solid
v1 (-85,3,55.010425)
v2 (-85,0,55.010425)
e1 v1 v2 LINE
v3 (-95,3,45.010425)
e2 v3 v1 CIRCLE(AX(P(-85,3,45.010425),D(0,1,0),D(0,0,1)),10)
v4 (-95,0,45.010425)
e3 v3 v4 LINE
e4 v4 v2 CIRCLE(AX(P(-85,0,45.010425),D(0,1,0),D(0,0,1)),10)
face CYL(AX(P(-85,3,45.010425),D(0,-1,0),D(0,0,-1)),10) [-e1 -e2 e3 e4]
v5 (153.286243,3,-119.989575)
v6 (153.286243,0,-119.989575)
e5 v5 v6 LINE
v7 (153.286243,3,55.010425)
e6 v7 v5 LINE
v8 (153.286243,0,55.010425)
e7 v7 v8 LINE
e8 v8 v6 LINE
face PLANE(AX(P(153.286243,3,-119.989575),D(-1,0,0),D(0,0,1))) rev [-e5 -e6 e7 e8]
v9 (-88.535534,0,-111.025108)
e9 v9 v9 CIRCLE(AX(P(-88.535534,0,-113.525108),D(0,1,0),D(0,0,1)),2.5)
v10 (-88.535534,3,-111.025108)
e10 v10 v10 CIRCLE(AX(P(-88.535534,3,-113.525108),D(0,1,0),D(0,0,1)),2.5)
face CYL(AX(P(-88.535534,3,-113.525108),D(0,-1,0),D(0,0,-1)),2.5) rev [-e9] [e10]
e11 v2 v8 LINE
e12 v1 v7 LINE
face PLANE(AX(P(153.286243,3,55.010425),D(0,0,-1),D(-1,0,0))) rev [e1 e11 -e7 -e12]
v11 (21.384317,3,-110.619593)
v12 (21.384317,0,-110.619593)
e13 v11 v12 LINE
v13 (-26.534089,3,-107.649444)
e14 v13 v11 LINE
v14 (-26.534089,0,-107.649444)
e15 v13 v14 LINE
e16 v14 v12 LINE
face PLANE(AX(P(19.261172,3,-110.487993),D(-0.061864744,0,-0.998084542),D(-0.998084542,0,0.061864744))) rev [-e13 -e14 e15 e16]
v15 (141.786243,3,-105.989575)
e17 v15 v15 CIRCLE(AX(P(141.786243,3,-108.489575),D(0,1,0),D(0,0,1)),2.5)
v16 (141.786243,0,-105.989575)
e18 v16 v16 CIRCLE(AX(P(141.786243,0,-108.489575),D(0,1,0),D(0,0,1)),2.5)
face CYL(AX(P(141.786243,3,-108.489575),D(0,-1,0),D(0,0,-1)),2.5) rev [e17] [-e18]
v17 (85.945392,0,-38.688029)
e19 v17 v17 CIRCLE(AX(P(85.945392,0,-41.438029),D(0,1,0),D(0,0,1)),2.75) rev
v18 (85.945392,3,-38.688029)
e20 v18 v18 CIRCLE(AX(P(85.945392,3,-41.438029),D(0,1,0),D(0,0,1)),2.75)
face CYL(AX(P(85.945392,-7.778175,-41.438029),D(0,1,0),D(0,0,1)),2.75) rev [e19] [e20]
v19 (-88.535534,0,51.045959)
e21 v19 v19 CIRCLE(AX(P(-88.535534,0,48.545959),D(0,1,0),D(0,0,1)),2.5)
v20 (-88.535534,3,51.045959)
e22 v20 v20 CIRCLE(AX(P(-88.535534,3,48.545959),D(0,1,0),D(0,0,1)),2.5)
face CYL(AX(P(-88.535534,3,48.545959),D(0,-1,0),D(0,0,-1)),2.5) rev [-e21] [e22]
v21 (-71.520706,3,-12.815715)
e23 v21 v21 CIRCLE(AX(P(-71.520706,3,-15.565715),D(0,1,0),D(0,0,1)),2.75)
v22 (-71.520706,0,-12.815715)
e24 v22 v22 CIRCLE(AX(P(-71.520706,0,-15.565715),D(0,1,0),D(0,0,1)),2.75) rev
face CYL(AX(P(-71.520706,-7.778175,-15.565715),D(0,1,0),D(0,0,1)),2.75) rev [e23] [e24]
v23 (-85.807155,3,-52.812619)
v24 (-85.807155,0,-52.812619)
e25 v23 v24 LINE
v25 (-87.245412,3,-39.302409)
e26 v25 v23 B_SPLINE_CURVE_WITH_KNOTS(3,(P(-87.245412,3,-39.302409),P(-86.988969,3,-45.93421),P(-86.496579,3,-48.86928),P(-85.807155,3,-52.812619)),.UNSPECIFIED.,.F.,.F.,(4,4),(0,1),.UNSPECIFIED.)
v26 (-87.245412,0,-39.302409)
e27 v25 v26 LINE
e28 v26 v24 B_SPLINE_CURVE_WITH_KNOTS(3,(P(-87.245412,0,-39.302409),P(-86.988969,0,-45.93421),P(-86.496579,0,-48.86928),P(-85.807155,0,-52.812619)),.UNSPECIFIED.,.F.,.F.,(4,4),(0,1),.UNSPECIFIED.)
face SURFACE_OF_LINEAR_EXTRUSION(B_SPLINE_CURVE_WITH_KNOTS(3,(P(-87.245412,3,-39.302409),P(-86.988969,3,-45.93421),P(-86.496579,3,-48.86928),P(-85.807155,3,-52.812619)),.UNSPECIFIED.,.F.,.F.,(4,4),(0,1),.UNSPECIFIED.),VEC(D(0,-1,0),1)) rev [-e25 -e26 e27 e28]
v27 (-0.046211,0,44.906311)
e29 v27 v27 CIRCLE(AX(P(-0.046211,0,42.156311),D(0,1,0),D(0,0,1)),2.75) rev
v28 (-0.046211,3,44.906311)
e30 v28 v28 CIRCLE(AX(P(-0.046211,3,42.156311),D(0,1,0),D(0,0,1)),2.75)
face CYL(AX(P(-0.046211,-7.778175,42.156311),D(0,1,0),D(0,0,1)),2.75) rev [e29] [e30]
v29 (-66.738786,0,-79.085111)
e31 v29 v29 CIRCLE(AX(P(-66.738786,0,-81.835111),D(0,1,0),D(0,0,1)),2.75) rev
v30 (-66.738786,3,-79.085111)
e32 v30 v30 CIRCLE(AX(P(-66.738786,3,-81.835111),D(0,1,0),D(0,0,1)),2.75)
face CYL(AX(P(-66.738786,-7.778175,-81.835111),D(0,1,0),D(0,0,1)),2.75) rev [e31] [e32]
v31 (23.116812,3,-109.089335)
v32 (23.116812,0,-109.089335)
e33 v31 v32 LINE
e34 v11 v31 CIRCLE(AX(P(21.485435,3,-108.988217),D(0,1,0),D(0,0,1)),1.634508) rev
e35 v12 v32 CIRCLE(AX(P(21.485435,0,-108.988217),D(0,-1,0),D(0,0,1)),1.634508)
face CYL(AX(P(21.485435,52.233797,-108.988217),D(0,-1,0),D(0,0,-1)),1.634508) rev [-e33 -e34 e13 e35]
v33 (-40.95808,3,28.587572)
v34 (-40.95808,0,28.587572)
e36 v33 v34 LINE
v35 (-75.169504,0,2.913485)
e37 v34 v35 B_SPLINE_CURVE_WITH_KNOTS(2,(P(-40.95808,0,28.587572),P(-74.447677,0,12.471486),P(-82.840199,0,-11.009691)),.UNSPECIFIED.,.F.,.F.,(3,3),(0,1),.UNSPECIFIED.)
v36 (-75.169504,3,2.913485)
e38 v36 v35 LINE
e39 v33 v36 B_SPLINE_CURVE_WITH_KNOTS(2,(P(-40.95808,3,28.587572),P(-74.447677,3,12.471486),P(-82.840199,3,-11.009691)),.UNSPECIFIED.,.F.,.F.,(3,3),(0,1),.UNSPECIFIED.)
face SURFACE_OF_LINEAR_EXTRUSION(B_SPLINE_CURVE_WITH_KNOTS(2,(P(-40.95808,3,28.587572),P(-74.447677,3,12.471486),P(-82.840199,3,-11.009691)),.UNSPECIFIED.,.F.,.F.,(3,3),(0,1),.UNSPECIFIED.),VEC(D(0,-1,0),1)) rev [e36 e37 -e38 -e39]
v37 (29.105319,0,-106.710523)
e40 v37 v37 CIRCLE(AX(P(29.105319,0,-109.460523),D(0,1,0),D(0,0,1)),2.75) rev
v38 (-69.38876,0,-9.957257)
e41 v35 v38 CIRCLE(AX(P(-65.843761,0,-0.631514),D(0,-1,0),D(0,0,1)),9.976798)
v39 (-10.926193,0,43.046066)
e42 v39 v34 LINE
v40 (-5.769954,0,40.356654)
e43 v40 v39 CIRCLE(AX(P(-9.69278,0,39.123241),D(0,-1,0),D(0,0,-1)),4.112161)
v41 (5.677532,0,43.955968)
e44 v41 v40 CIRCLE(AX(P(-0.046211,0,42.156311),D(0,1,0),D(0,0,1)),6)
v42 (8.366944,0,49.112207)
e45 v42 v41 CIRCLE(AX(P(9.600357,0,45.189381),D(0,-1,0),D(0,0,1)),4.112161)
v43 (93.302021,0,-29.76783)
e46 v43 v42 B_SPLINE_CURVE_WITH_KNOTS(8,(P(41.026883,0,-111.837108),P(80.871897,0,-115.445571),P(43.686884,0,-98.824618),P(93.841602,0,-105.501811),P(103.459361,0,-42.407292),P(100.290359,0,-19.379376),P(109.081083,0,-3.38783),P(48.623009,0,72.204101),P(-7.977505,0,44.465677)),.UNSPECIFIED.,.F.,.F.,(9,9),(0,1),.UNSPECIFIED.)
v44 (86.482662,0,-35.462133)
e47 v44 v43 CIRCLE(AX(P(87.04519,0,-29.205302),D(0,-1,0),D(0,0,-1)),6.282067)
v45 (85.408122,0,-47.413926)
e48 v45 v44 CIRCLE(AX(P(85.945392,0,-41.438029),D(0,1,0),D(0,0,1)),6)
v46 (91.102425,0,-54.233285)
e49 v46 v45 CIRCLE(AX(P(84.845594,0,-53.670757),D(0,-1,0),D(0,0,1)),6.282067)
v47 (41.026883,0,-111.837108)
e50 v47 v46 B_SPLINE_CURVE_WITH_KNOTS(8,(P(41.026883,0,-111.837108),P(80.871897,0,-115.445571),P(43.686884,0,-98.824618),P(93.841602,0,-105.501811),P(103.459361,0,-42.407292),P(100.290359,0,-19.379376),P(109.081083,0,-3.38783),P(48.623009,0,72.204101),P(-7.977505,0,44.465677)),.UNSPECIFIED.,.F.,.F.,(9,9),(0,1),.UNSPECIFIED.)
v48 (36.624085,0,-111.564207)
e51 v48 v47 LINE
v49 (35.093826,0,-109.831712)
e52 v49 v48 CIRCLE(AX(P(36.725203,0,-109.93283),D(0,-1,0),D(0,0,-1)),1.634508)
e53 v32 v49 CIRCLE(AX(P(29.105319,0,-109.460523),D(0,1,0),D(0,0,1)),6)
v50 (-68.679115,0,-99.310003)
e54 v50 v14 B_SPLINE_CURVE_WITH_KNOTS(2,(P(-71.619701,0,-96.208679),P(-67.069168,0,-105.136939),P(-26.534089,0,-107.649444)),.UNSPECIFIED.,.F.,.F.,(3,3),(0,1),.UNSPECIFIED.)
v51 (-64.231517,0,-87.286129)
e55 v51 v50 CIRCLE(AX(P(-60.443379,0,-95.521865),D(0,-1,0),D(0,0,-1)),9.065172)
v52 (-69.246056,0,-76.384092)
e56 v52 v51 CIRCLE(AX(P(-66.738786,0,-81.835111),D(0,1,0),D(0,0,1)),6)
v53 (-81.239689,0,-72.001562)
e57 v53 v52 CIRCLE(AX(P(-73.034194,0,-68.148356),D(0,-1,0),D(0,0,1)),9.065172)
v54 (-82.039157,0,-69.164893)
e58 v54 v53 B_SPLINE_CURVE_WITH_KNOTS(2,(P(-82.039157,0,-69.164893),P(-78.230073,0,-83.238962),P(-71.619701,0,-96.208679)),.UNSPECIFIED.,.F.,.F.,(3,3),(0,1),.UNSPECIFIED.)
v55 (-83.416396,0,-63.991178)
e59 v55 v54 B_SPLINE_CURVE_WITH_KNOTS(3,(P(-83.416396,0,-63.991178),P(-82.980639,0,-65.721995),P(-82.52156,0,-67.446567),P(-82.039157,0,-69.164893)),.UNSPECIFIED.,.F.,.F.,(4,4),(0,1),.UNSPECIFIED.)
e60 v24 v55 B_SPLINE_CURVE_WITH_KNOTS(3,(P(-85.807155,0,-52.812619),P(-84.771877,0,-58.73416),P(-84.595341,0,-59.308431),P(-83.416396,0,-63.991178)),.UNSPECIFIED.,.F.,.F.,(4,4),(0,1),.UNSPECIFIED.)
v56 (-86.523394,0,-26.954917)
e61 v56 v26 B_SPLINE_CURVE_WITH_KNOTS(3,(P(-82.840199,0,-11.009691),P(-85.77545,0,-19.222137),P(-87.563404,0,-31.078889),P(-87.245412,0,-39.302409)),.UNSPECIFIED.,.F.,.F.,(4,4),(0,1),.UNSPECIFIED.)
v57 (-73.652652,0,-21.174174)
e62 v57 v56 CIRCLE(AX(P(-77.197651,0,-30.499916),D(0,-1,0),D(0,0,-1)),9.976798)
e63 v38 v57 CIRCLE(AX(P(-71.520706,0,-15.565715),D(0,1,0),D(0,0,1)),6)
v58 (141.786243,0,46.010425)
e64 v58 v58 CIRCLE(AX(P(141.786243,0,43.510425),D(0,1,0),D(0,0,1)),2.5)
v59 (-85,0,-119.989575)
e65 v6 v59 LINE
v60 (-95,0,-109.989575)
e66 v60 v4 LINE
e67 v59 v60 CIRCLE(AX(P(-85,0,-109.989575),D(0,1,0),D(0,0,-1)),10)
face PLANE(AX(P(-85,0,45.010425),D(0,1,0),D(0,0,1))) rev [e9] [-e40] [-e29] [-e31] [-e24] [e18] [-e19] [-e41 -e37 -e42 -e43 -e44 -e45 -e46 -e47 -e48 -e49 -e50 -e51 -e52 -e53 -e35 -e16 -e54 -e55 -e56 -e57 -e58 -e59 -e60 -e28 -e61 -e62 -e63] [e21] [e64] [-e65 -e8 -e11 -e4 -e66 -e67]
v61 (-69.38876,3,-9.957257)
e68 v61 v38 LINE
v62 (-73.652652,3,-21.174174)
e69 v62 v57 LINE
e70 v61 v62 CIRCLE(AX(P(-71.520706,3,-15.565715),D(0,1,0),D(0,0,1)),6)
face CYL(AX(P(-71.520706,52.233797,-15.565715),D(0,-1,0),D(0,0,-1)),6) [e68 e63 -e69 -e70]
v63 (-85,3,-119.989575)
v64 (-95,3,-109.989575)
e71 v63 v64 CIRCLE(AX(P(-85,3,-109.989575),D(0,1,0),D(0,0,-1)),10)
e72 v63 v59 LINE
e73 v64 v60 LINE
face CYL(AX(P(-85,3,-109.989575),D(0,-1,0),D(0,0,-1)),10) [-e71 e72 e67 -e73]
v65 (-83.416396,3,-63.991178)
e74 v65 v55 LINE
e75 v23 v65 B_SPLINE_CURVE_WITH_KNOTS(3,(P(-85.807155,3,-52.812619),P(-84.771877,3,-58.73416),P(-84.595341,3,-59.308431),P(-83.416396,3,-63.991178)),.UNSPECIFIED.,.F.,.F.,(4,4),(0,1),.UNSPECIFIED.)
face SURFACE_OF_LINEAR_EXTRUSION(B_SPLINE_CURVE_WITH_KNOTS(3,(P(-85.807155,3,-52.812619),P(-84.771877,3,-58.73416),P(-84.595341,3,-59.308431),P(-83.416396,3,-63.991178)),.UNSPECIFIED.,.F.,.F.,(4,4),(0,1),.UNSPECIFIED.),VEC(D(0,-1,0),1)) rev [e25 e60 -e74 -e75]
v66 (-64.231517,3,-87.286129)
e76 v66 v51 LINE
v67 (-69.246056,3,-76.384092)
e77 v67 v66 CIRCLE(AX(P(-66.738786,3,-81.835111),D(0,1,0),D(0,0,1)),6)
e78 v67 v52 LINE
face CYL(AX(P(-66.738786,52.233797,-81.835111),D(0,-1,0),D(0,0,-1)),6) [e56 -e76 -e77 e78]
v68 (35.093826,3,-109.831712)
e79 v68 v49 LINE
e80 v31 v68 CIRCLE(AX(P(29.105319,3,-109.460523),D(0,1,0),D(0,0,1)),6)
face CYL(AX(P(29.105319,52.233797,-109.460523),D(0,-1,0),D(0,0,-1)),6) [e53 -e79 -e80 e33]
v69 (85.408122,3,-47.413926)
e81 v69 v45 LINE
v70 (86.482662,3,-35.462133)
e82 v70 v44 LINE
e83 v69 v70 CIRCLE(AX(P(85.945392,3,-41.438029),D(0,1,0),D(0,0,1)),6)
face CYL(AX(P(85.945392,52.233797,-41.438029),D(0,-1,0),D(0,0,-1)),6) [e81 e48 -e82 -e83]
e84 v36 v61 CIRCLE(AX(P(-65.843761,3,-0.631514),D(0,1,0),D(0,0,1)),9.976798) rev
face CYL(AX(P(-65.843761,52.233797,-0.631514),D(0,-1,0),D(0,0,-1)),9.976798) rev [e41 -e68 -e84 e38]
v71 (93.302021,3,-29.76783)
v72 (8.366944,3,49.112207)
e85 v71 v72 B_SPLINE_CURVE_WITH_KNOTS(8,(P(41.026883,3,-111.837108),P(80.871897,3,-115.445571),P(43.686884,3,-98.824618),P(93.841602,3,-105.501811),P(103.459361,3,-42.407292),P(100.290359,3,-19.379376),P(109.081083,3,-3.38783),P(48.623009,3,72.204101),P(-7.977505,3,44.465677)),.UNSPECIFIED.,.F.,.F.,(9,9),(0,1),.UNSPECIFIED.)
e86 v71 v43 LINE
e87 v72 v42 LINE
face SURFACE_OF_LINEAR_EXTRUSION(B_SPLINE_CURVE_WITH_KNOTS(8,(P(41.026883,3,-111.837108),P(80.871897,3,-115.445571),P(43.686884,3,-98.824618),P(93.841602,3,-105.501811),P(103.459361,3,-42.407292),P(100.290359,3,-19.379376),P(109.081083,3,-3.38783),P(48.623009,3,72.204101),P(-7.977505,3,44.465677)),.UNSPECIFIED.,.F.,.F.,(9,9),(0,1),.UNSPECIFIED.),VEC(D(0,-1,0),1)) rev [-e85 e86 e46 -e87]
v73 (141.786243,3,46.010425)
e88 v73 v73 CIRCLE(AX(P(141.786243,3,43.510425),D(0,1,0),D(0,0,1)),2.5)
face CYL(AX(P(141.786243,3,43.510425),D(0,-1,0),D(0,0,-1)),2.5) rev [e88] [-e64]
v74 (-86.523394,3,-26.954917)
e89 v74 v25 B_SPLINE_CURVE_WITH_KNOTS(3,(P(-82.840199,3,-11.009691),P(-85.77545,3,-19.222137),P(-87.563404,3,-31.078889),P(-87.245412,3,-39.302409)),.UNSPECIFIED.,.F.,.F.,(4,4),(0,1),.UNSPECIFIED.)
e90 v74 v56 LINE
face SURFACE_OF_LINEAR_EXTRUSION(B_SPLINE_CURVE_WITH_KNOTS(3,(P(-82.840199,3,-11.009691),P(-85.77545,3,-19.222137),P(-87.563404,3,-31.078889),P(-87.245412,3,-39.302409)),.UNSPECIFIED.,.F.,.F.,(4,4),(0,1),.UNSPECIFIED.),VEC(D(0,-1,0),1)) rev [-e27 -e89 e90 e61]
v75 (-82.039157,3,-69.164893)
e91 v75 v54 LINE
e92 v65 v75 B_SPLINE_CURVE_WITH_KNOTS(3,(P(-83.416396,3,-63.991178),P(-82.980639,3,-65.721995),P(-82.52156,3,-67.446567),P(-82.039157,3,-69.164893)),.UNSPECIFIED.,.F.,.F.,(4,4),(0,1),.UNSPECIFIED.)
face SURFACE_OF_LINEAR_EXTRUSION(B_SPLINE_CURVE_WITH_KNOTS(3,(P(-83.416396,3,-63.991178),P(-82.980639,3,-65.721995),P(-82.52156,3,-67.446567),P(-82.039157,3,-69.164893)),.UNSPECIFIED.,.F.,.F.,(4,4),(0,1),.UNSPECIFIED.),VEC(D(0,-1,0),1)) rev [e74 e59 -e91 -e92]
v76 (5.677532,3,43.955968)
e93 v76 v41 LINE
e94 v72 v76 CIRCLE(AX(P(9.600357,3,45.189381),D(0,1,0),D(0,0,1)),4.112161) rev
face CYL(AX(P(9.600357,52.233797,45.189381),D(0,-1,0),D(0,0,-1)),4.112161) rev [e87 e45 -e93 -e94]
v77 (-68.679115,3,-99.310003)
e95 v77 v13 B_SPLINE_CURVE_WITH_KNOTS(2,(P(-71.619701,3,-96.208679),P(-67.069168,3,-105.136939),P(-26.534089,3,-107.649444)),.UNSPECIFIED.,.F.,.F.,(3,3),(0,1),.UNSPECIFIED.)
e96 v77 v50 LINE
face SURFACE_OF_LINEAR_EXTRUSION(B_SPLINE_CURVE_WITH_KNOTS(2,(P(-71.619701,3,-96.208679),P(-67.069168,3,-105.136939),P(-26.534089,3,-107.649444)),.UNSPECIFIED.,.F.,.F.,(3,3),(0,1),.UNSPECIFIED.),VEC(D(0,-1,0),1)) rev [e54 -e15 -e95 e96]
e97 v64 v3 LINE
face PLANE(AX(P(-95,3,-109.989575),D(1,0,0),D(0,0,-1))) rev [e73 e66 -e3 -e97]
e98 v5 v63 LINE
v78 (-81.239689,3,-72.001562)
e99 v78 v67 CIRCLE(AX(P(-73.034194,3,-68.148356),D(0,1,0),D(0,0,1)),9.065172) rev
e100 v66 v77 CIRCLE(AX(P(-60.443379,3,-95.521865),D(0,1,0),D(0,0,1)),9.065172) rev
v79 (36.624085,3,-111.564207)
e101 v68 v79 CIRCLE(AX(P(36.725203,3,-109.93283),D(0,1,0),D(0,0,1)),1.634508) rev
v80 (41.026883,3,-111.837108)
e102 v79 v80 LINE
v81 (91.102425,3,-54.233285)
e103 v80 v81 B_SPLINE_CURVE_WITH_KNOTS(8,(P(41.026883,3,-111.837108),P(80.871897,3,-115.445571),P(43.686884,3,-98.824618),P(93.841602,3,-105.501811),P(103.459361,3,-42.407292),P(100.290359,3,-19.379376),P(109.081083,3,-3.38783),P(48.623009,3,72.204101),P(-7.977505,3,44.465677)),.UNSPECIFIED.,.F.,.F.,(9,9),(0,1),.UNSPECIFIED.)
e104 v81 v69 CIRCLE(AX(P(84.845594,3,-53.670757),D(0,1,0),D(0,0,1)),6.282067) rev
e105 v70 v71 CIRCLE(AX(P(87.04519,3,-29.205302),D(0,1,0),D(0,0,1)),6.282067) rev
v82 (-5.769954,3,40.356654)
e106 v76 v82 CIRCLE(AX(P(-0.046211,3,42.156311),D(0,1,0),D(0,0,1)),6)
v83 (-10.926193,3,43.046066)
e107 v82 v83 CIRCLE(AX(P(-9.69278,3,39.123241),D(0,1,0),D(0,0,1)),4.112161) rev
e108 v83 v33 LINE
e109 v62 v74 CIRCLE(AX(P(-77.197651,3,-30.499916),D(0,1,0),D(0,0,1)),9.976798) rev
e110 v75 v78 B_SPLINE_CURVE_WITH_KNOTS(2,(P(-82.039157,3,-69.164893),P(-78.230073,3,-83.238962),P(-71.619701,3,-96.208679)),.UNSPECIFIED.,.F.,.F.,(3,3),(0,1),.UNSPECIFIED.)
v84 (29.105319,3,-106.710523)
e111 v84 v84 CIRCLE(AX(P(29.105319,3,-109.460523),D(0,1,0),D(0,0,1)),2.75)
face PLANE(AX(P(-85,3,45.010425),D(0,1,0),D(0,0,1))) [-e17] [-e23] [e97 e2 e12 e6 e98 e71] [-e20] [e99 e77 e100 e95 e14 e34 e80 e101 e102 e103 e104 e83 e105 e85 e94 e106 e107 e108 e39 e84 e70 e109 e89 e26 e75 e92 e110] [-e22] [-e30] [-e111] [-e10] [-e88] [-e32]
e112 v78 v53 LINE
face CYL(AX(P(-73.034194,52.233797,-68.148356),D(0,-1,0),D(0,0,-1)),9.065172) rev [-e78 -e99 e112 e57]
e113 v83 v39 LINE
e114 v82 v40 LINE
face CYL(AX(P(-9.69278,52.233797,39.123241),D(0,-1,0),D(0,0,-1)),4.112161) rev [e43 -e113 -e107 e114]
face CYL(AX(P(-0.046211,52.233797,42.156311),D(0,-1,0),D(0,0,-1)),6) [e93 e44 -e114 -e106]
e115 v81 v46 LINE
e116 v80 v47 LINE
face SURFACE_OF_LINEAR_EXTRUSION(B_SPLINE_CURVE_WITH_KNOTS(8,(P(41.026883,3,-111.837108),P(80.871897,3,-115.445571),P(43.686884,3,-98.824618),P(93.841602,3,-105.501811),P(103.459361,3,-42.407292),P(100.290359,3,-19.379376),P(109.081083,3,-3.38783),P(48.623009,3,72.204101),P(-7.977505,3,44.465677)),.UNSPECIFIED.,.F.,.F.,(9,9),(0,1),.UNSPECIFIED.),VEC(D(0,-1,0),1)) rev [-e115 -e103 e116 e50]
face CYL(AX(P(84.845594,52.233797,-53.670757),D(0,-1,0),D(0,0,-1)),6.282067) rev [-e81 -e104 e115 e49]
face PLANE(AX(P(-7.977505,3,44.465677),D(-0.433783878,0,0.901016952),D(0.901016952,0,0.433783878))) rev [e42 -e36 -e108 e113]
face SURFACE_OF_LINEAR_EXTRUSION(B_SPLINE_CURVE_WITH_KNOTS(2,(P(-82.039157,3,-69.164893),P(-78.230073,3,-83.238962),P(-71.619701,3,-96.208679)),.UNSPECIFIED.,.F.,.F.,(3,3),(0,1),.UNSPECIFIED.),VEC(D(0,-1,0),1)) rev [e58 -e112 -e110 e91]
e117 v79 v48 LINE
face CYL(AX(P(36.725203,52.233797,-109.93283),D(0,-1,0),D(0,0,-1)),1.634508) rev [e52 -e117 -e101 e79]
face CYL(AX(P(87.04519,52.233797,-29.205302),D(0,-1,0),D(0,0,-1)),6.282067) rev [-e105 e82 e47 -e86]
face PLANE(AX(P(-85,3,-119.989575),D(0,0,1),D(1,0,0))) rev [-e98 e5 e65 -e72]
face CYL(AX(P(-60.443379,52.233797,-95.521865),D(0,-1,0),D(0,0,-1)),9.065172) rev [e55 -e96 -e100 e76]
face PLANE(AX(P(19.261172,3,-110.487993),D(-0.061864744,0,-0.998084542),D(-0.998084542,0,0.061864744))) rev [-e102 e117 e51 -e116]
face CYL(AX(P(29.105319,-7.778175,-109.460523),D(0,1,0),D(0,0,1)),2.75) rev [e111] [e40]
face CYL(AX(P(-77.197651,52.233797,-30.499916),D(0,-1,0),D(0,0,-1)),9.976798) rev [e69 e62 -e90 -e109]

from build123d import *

# Parameters (mm, degrees)
ESQUISSE1_R         = 2.5
BOSS_EXTRU_1_DEPTH  = 3
CUT_EXTRUDE1_START  = -3
CUT_EXTRUDE1_DEPTH  = 3
BOSS_EXTRUDE1_DEPTH = 3
SKETCH1_R           = 2.75
CUT_EXTRUDE2_DEPTH  = 3


# Read off the part's stored shape, not the designer's step: Cut-Extrude1
with BuildPart() as part:
    # Esquisse1 → Boss.-Extru.1 (new body)
    with BuildSketch(Plane(origin=(0, 0, 0), x_dir=(1, 0, 0), z_dir=(0, 1, 0))):
        with BuildLine():
            Line((-85, 119.989574584), (153.28624341, 119.989574584))
            Line((153.28624341, 119.989574584), (153.28624341, -55.010425416))
            Line((153.28624341, -55.010425416), (-85, -55.010425416))
            ThreePointArc((-85, -55.010425416), (-92.071067812, -52.081493228), (-95, -45.010425416))
            Line((-95, -45.010425416), (-95, 109.989574584))
            ThreePointArc((-95, 109.989574584), (-92.071067812, 117.060642396), (-85, 119.989574584))
        make_face()
        with Locations(Location((141.78624341, -43.510425416, 0), (0, 0, 270))):
            Circle(ESQUISSE1_R, mode=Mode.SUBTRACT)
        with Locations(Location((141.78624341, 108.489574584, 0), (0, 0, 270))):
            Circle(ESQUISSE1_R, mode=Mode.SUBTRACT)
        with Locations(Location((-88.535533906, 113.52510849, 0), (0, 0, 270))):
            Circle(ESQUISSE1_R, mode=Mode.SUBTRACT)
        with Locations(Location((-88.535533906, -48.545959322, 0), (0, 0, 270))):
            Circle(ESQUISSE1_R, mode=Mode.SUBTRACT)
    extrude(amount=BOSS_EXTRU_1_DEPTH)

    # Cut-Extrude1 outline → Cut-Extrude1 (cut)
    with BuildSketch(Plane.XZ.offset(CUT_EXTRUDE1_START)):
        with BuildLine():
            Line((-26.534089411, -107.649444077), (41.026883272, -111.837107673))
            add(Edge.make_bspline(
                [(41.026883272, -111.837107673), (80.871896507, -115.445570806), (43.6868837, -98.824618367), (93.841601725, -105.501811245), (103.459361301, -42.407292201), (100.29035903, -19.379375914), (109.081082927, -3.387830236), (48.623008548, 72.204101039), (-7.977504863, 44.465677035)],
                knots=[0, 0, 0, 0, 0, 0, 0, 0, 0, 1, 1, 1, 1, 1, 1, 1, 1, 1], degree=8))
            Line((-7.977504863, 44.465677035), (-40.958080323, 28.587571847))
            add(Edge.make_bspline(
                [(-40.958080323, 28.587571847), (-63.284478038, 17.843514847), (-77.245184412, 4.644427122), (-85.775449686, -19.222136636), (-87.563403654, -31.078889142), (-86.988969289, -45.934210012), (-86.496578535, -48.869280426), (-84.771877477, -58.734159705), (-84.595340706, -59.308431064), (-82.980639435, -65.721995035), (-82.521559893, -67.446566753), (-82.039157422, -69.164892884)],
                knots=[0, 0, 0, 0, 1, 1, 1.52461883, 1.52461883, 1.947694096, 1.947694096, 2.583008028, 2.583008028, 2.817830116, 2.817830116, 2.817830116, 2.817830116], degree=3))
            add(Edge.make_bspline(
                [(-82.039157422, -69.164892884), (-78.230073131, -83.238962063), (-67.06916766, -105.136939227), (-26.534089411, -107.649444077)],
                knots=[0, 0, 0, 1, 1.688392895, 1.688392895, 1.688392895], degree=2))
        make_face()
    extrude(amount=CUT_EXTRUDE1_DEPTH, mode=Mode.SUBTRACT)

    # Sketch4 → Boss-Extrude1 (add)
    with BuildSketch(Plane(origin=(0, 0, 0), x_dir=(1, 0, 0), z_dir=(0, 1, 0))):
        with BuildLine():
            Line((93.302020541, 29.767829549), (97.480208944, 29.767829549))
            Line((97.480208944, 29.767829549), (95.391114743, 55.173684352))
            Line((95.391114743, 55.173684352), (91.102425061, 54.233284915))
            ThreePointArc((91.102425061, 54.233284915), (89.667608862, 49.644276713), (85.408121779, 47.41392616))
            ThreePointArc((85.408121779, 47.41392616), (79.969495118, 40.900759492), (86.482661786, 35.462132831))
            ThreePointArc((86.482661786, 35.462132831), (91.071669987, 34.027316631), (93.302020541, 29.767829549))
        make_face()
        with BuildLine():
            Line((36.624084675, 111.564206934), (36.331188094, 116.289605103))
            Line((36.331188094, 116.289605103), (21.485435183, 115.369413807))
            Line((21.485435183, 115.369413807), (21.384316793, 110.619593222))
            ThreePointArc((21.384316793, 110.619593222), (22.567491202, 110.213275552), (23.116811871, 109.089334924))
            ThreePointArc((23.116811871, 109.089334924), (29.47650759, 103.472016137), (35.093826377, 109.831711857))
            ThreePointArc((35.093826377, 109.831711857), (35.500144047, 111.014886266), (36.624084675, 111.564206934))
        make_face()
        with BuildLine():
            Line((-68.679115078, 99.310003258), (-77.197650928, 103.460523399))
            Line((-77.197650928, 103.460523399), (-90.092844695, 74.888102234))
            Line((-90.092844695, 74.888102234), (-81.269930428, 71.936494141))
            ThreePointArc((-81.269930428, 71.936494141), (-76.179120901, 76.650519158), (-69.246055906, 76.384092275))
            ThreePointArc((-69.246055906, 76.384092275), (-61.287768194, 79.327841024), (-64.231516944, 87.286128736))
            ThreePointArc((-64.231516944, 87.286128736), (-68.94554196, 92.376938263), (-68.679115078, 99.310003258))
        make_face()
        with BuildLine():
            Line((-86.523393512, 26.954917178), (-90.889130919, 29.767829549))
            Line((-90.889130919, 29.767829549), (-75.16950367, -12.427072891))
            Line((-75.16950367, -12.427072891), (-75.16950367, -2.91348489))
            ThreePointArc((-75.16950367, -2.91348489), (-74.944749705, 4.719117072), (-69.388760046, 9.957256624))
            ThreePointArc((-69.388760046, 9.957256624), (-65.912247557, 17.697661065), (-73.652651998, 21.174173554))
            ThreePointArc((-73.652651998, 21.174173554), (-81.28525396, 21.39892752), (-86.523393512, 26.954917178))
        make_face()
        with BuildLine():
            Line((8.366944085, -49.112206716), (11.747056213, -51.290065422))
            Line((11.747056213, -51.290065422), (-16.208470261, -45.189381197))
            Line((-16.208470261, -45.189381197), (-10.926193077, -43.04606622))
            ThreePointArc((-10.926193077, -43.04606622), (-7.791078178, -42.76925209), (-5.769954322, -40.356653937))
            ThreePointArc((-5.769954322, -40.356653937), (1.753445752, -36.432567887), (5.677531802, -43.955967961))
            ThreePointArc((5.677531802, -43.955967961), (5.954345932, -47.09108286), (8.366944085, -49.112206716))
        make_face()
    extrude(amount=BOSS_EXTRUDE1_DEPTH)

    # Sketch1 → Cut-Extrude2 (cut)
    with BuildSketch(Plane(origin=(0, 3, 0), x_dir=(1, 0, 0), z_dir=(0, 1, 0))):
        with Locations(Location((29.105319124, 109.46052339, 0), (0, 0, 270))):
            Circle(SKETCH1_R)
        with Locations(Location((85.945391782, 41.438029495, 0), (0, 0, 270))):
            Circle(SKETCH1_R)
        with Locations(Location((-0.04621126, -42.156310949, 0), (0, 0, 270))):
            Circle(SKETCH1_R)
        with Locations(Location((-66.738786425, 81.835110506, 0), (0, 0, 270))):
            Circle(SKETCH1_R)
        with Locations(Location((-71.520706022, 15.565715089, 0), (0, 0, 270))):
            Circle(SKETCH1_R)
    extrude(amount=-CUT_EXTRUDE2_DEPTH, mode=Mode.SUBTRACT)


solid = part.part
